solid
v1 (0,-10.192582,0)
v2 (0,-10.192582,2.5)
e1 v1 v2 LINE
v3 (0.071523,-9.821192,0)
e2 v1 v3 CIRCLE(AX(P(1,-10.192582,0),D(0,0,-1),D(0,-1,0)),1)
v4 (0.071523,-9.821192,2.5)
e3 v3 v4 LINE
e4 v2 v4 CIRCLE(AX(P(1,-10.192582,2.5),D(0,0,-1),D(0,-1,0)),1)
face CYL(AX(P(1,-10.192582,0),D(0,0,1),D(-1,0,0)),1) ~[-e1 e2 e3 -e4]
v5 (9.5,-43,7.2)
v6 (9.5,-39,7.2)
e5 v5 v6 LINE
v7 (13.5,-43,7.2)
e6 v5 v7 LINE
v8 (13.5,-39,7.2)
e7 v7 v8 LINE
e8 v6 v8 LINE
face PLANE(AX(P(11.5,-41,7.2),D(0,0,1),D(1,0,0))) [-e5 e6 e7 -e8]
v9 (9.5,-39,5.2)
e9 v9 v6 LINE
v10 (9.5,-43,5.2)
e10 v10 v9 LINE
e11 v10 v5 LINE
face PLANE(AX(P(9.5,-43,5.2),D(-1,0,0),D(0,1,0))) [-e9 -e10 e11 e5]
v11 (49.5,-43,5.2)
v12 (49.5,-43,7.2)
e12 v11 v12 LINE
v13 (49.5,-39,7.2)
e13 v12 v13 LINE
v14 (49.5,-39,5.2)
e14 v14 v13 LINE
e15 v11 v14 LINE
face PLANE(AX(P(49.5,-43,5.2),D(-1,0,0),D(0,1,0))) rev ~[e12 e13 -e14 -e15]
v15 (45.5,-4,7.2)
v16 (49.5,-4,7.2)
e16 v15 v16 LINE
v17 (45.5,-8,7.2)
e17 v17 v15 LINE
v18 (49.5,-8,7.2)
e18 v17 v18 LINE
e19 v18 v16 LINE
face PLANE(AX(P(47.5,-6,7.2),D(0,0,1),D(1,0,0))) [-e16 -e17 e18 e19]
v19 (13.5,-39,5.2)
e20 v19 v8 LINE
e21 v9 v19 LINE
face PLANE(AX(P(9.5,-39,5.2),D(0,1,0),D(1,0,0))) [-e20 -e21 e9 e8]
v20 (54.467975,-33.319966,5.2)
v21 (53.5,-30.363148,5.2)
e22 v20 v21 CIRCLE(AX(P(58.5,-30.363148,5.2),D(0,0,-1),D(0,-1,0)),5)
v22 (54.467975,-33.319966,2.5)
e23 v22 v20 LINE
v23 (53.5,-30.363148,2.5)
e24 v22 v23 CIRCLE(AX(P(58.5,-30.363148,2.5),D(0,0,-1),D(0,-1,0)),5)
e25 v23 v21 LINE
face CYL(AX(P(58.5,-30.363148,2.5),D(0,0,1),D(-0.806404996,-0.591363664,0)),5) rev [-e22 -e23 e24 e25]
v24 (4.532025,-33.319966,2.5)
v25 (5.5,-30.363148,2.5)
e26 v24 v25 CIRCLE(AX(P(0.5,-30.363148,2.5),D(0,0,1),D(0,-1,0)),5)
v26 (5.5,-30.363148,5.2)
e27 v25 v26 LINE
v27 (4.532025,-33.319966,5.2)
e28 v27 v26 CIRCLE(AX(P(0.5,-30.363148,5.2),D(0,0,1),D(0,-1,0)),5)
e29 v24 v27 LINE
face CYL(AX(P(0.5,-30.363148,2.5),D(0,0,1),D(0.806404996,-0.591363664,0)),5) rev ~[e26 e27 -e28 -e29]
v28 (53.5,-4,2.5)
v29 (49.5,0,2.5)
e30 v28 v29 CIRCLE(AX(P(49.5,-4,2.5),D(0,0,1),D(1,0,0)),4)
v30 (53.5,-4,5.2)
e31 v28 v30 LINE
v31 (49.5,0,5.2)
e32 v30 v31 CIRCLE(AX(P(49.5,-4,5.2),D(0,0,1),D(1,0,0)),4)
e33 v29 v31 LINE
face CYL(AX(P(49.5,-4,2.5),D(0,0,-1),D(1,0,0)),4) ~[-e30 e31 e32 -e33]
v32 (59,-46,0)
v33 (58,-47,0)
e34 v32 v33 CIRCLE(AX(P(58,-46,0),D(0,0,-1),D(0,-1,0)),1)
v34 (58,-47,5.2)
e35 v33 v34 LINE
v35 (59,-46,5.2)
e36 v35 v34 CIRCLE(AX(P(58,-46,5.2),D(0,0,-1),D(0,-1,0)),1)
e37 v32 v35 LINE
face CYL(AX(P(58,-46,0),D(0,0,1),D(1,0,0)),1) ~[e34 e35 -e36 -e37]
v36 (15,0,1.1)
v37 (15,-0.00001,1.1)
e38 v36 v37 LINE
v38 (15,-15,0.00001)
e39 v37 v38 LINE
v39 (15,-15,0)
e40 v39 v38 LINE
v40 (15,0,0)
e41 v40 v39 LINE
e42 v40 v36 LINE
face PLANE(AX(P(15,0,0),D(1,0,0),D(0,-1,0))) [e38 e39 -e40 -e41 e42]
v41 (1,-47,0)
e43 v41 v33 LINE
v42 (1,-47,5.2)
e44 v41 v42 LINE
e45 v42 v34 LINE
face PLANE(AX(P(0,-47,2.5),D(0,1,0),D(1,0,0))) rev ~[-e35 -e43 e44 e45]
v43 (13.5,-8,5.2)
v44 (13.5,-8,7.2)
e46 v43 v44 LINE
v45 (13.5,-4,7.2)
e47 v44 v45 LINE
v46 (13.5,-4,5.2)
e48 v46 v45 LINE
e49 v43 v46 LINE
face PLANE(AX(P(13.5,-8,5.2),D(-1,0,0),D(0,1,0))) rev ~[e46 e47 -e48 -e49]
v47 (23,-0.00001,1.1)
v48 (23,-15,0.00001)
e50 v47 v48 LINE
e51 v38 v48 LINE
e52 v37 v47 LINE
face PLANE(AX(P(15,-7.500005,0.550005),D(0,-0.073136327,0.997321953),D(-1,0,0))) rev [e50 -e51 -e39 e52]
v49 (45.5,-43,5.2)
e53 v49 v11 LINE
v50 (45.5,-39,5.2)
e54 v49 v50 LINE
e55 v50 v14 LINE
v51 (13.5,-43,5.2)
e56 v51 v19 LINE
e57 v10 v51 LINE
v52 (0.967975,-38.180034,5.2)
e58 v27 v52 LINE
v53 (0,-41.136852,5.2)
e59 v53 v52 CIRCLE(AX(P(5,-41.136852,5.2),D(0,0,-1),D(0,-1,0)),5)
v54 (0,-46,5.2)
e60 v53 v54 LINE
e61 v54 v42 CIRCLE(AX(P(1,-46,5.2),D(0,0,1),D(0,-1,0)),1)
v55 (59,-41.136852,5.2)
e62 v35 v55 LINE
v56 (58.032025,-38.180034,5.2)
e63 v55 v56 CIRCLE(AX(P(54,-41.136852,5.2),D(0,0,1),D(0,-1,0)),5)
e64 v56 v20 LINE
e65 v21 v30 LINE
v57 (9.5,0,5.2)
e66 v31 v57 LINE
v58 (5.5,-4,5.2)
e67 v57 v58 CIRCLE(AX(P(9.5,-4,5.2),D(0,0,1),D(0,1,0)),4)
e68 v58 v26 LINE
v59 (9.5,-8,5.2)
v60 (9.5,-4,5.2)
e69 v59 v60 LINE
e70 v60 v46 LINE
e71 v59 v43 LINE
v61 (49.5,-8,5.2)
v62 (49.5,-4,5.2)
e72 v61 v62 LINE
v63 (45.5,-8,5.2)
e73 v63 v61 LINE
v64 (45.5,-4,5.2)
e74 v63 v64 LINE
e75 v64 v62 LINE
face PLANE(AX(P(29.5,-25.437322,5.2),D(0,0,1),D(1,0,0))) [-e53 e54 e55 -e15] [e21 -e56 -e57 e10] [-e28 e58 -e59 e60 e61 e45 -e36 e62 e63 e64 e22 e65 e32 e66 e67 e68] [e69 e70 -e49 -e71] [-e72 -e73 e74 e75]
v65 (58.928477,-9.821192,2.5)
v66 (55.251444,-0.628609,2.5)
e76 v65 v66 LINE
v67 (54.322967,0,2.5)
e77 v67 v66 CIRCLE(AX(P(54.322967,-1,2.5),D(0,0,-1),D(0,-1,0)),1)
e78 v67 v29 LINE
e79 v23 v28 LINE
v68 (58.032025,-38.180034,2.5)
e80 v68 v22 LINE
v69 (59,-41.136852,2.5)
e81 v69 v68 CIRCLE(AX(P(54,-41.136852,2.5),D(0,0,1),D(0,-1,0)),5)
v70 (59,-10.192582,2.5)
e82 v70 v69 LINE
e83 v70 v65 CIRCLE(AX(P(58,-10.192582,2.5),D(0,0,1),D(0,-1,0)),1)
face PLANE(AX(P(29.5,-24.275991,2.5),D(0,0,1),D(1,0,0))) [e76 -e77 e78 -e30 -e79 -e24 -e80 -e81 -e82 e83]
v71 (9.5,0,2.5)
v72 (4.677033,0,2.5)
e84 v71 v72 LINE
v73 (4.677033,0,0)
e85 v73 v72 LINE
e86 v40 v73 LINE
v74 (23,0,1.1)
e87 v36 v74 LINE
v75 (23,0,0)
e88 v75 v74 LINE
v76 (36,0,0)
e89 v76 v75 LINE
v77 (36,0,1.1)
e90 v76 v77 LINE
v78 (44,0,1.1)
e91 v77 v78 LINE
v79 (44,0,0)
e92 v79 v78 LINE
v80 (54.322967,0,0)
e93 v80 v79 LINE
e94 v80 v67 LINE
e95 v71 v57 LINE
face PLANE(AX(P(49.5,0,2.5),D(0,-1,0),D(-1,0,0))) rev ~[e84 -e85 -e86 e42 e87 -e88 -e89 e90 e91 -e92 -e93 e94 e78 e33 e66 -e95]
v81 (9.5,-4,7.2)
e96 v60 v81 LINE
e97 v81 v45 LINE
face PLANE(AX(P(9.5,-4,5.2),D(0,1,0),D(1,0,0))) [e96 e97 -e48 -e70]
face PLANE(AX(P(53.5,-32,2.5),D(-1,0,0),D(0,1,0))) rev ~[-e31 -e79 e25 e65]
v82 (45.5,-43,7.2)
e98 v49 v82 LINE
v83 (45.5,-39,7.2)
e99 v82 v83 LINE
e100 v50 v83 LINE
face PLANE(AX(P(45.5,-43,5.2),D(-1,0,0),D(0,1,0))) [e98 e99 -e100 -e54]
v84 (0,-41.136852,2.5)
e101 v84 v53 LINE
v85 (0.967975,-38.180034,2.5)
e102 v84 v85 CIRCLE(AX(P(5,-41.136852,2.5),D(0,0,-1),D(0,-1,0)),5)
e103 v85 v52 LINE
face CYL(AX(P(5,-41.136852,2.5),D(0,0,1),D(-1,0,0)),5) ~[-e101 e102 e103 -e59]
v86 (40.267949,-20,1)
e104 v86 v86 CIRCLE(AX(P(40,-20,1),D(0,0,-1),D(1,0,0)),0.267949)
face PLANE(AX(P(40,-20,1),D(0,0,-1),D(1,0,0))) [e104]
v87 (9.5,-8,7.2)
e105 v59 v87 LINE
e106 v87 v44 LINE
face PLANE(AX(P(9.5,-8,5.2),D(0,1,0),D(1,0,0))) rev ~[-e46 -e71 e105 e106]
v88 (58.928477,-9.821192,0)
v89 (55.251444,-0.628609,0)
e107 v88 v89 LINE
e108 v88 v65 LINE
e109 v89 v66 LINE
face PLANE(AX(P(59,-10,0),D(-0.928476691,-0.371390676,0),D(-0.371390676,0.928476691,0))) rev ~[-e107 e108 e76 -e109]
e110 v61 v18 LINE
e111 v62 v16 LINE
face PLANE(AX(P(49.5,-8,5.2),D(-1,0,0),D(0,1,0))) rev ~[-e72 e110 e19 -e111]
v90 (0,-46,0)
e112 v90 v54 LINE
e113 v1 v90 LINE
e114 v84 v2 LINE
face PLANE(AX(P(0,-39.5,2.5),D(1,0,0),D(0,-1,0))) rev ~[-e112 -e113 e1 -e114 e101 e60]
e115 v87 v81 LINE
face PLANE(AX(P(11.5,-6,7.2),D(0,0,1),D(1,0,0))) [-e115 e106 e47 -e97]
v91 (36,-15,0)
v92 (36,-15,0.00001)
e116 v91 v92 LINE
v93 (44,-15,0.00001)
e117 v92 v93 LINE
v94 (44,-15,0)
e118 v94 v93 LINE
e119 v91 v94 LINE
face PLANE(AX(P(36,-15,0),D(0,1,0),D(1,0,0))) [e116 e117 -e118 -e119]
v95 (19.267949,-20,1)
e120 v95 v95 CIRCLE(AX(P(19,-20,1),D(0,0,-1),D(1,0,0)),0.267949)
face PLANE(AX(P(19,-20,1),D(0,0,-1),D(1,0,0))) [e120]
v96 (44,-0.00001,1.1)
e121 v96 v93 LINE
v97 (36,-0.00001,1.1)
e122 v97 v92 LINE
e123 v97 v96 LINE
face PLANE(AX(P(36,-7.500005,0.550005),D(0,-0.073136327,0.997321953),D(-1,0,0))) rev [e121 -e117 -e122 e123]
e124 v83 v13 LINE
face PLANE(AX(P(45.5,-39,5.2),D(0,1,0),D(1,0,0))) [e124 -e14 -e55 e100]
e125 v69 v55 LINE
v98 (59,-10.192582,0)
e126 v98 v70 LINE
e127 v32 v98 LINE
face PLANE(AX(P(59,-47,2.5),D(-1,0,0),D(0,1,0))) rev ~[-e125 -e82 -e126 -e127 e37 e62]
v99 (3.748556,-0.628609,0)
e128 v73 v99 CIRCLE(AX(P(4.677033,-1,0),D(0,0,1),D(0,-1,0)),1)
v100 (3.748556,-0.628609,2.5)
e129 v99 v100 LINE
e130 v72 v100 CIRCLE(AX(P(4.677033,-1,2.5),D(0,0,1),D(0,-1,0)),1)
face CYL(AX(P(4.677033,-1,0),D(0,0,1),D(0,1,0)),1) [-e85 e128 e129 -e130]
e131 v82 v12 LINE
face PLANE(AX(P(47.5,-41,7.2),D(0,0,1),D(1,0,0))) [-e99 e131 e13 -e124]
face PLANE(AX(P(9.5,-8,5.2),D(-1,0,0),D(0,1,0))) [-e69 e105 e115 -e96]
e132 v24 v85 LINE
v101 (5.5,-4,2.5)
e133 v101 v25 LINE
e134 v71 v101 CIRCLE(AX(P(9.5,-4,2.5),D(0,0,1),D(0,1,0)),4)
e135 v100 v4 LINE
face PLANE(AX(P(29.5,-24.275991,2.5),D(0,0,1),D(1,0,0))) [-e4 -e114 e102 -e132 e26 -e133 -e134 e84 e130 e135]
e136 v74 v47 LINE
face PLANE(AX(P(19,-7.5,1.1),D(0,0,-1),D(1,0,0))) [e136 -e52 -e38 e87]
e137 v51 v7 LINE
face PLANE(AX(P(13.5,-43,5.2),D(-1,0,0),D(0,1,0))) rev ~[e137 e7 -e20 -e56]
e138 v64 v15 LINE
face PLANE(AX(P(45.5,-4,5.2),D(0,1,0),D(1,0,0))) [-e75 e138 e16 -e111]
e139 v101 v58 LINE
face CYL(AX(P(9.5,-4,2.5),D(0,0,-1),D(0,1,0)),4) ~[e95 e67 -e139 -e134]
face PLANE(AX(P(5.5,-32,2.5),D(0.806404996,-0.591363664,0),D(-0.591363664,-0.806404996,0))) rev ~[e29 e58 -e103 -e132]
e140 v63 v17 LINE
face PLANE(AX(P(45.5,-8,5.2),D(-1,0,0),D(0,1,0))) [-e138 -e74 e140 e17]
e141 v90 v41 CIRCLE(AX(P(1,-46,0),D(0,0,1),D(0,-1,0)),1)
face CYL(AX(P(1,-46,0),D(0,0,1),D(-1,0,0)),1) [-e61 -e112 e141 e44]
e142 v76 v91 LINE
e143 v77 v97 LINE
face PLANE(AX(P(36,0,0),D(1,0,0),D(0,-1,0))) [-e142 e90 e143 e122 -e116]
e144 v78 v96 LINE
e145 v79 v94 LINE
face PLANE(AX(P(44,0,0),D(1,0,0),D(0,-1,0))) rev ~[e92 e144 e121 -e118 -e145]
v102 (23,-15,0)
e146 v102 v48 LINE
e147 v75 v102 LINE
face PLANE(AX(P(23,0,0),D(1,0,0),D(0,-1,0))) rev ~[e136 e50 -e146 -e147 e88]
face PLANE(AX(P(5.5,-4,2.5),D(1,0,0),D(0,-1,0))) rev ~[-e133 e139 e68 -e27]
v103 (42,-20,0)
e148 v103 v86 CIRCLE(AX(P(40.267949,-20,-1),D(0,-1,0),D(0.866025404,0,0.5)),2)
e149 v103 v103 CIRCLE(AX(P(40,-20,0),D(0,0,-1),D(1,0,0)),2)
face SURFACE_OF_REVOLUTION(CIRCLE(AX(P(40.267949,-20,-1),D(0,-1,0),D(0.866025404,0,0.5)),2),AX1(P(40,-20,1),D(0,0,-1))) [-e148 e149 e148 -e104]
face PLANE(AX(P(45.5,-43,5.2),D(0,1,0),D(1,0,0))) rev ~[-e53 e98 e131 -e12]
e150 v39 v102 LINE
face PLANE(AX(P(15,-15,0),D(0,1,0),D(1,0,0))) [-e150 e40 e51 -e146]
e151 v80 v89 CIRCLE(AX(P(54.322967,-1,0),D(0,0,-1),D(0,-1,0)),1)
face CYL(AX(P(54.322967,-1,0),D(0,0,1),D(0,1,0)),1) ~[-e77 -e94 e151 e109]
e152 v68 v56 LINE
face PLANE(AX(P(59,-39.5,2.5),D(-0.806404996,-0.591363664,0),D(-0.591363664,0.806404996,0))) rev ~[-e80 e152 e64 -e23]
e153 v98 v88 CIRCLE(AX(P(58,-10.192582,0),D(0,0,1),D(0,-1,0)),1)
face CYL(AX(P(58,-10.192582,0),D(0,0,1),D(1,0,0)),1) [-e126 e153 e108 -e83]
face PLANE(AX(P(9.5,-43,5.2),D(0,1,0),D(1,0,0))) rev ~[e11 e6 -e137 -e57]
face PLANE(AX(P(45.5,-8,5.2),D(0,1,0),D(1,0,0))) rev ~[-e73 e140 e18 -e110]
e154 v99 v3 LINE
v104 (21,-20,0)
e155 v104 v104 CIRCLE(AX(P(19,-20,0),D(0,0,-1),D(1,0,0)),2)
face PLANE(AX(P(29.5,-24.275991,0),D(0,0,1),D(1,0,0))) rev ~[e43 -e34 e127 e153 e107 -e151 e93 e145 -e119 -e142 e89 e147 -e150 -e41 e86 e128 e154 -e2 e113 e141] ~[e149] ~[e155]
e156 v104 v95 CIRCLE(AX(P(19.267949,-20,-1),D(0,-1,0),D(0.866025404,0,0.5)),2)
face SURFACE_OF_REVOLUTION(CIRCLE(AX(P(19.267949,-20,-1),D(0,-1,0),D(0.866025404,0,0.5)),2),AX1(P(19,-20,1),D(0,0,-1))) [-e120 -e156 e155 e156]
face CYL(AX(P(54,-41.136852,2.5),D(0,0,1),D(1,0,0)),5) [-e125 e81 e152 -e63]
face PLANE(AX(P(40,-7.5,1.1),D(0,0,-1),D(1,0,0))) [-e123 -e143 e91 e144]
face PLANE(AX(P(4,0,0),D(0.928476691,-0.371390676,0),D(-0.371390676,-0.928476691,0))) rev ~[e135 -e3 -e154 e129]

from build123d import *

# Parameters (mm, degrees)
F1_DEPTH    = 2.5
F3_DEPTH    = 2.7
F4_R        = 1
F5_R        = 5
F7_R        = 2
F8_DEPTH    = 1
F6_W        = 8
F6_H        = 15
F9_DEPTH    = 1.1
F10_SIZE2   = 1.09999
F10_SIZE    = 14.99999
F10_2_SIZE2 = 1.09999
F10_2_SIZE  = 14.99999
F13_W       = 4
F13_H       = 4
F14_DEPTH   = 2


# Not quite as in the source:
# - a fillet or chamfer that OpenCascade refuses, or shapes differently, is made with other operations: its cross-section is extruded or revolved along the edge and cut away or added
# - two fillets or chamfers of one size are made in one step
# - a fillet or chamfer is up to 0.001 mm smaller than in the source, because OpenCascade refuses the exact size


with BuildPart() as f1:
    # F0 (on Top) → F1 (new body)
    with BuildSketch(Plane.XY):
        Polygon((55, 0), (4, 0), (0, -10), (0, -47), (59, -47), (59, -10), align=None)
    extrude(amount=F1_DEPTH)

    # F2 (on face) → F3 (join)
    with BuildSketch(Plane.XY.offset(2.5)):
        with BuildLine():
            Line((0, -39.5), (0, -47))
            Line((0, -47), (59, -47))
            Line((59, -47), (59, -39.5))
            Line((59, -39.5), (53.5, -32))
            Line((53.5, -32), (53.5, -4))
            ThreePointArc((53.5, -4), (52.3284271247, -1.1715728753), (49.5, 0))
            Line((49.5, 0), (9.5, 0))
            ThreePointArc((9.5, 0), (6.6715728753, -1.1715728753), (5.5, -4))
            Line((5.5, -4), (5.5, -32))
            Line((5.5, -32), (0, -39.5))
        make_face()
    extrude(amount=F3_DEPTH)

    # F4
    f4_edges = [f1.edges().sort_by_distance(p)[0] for p in [
        (0, -47, 2.6),
        (59, -47, 2.6),
        (4, 0, 1.25),
        (55, 0, 1.25),
        (59, -10, 1.25),
        (0, -10, 1.25),
    ]]
    fillet(f4_edges, radius=F4_R)

    # F5
    f5_edges = [f1.edges().sort_by_distance(p)[0] for p in [
        (0, -39.5, 3.85),
        (59, -39.5, 3.85),
        (53.5, -32, 3.85),
        (5.5, -32, 3.85),
    ]]
    fillet(f5_edges, radius=F5_R)

    # F7 (on face) → F8 (cut)
    with BuildSketch(Plane(origin=(0, 0, 0), x_dir=(1, 0, 0), z_dir=(0, 0, -1))):
        with Locations((19, 20)):
            Circle(F7_R)
        with Locations((40, 20)):
            Circle(F7_R)
    extrude(amount=-F8_DEPTH, mode=Mode.SUBTRACT)

    # F6 (on face) → F9 (cut)
    with BuildSketch(Plane(origin=(0, 0, 0), x_dir=(1, 0, 0), z_dir=(0, 0, -1))):
        with Locations((40, 7.5)):
            Rectangle(F6_W, F6_H)
        with Locations((19, 7.5)):
            Rectangle(F6_W, F6_H)
    extrude(amount=-F9_DEPTH, mode=Mode.SUBTRACT)

    # F10 (size 15 and 1.1 in the source; OpenCascade refuses exactly that, so slightly less here)
    f10_edges = [f1.edges().sort_by_distance(p)[0] for p in [
        (40, -15, 1.1),
    ]]
    f10_side = f1.faces().sort_by_distance((40, -7.5, 1.1))[0]
    chamfer(f10_edges, length=F10_SIZE, length2=F10_SIZE2, reference=f10_side)

    # F10#2 (size 15 and 1.1 in the source; OpenCascade refuses exactly that, so slightly less here)
    f10_2_edges = [f1.edges().sort_by_distance(p)[0] for p in [
        (19, -15, 1.1),
    ]]
    f10_2_side = f1.faces().sort_by_distance((19, -7.5, 1.1))[0]
    chamfer(f10_2_edges, length=F10_2_SIZE, length2=F10_2_SIZE2, reference=f10_2_side)

    # F12: fillet of radius 2 on 2 edges, made by hand

    # F12_s1 → F12_t2 (revolve)
    with BuildSketch(Plane.XZ.offset(20)):
        with BuildLine():
            ThreePointArc((42, 0), (41.2679491924, 0.7320508076), (40.2679491924, 1))
            Line((40.2679491924, 1), (42, 1))
            Line((42, 1), (42, 0))
        make_face()
    revolve(axis=Axis((40, -20, 1), (0, 0, -1)))

    # F12_s3 → F12_t4 (revolve)
    with BuildSketch(Plane.XZ.offset(20)):
        with BuildLine():
            ThreePointArc((21, 0), (20.2679491924, 0.7320508076), (19.2679491924, 1))
            Line((19.2679491924, 1), (21, 1))
            Line((21, 1), (21, 0))
        make_face()
    revolve(axis=Axis((19, -20, 1), (0, 0, -1)))

    # F13 (on face) → F14 (join)
    with BuildSketch(Plane.XY.offset(5.2)):
        with Locations((11.5, -6)):
            Rectangle(F13_W, F13_H)
        with Locations((11.5, -41)):
            Rectangle(F13_W, F13_H)
        with Locations((47.5, -6)):
            Rectangle(F13_W, F13_H)
        with Locations((47.5, -41)):
            Rectangle(F13_W, F13_H)
    extrude(amount=F14_DEPTH)


solid = f1.part
